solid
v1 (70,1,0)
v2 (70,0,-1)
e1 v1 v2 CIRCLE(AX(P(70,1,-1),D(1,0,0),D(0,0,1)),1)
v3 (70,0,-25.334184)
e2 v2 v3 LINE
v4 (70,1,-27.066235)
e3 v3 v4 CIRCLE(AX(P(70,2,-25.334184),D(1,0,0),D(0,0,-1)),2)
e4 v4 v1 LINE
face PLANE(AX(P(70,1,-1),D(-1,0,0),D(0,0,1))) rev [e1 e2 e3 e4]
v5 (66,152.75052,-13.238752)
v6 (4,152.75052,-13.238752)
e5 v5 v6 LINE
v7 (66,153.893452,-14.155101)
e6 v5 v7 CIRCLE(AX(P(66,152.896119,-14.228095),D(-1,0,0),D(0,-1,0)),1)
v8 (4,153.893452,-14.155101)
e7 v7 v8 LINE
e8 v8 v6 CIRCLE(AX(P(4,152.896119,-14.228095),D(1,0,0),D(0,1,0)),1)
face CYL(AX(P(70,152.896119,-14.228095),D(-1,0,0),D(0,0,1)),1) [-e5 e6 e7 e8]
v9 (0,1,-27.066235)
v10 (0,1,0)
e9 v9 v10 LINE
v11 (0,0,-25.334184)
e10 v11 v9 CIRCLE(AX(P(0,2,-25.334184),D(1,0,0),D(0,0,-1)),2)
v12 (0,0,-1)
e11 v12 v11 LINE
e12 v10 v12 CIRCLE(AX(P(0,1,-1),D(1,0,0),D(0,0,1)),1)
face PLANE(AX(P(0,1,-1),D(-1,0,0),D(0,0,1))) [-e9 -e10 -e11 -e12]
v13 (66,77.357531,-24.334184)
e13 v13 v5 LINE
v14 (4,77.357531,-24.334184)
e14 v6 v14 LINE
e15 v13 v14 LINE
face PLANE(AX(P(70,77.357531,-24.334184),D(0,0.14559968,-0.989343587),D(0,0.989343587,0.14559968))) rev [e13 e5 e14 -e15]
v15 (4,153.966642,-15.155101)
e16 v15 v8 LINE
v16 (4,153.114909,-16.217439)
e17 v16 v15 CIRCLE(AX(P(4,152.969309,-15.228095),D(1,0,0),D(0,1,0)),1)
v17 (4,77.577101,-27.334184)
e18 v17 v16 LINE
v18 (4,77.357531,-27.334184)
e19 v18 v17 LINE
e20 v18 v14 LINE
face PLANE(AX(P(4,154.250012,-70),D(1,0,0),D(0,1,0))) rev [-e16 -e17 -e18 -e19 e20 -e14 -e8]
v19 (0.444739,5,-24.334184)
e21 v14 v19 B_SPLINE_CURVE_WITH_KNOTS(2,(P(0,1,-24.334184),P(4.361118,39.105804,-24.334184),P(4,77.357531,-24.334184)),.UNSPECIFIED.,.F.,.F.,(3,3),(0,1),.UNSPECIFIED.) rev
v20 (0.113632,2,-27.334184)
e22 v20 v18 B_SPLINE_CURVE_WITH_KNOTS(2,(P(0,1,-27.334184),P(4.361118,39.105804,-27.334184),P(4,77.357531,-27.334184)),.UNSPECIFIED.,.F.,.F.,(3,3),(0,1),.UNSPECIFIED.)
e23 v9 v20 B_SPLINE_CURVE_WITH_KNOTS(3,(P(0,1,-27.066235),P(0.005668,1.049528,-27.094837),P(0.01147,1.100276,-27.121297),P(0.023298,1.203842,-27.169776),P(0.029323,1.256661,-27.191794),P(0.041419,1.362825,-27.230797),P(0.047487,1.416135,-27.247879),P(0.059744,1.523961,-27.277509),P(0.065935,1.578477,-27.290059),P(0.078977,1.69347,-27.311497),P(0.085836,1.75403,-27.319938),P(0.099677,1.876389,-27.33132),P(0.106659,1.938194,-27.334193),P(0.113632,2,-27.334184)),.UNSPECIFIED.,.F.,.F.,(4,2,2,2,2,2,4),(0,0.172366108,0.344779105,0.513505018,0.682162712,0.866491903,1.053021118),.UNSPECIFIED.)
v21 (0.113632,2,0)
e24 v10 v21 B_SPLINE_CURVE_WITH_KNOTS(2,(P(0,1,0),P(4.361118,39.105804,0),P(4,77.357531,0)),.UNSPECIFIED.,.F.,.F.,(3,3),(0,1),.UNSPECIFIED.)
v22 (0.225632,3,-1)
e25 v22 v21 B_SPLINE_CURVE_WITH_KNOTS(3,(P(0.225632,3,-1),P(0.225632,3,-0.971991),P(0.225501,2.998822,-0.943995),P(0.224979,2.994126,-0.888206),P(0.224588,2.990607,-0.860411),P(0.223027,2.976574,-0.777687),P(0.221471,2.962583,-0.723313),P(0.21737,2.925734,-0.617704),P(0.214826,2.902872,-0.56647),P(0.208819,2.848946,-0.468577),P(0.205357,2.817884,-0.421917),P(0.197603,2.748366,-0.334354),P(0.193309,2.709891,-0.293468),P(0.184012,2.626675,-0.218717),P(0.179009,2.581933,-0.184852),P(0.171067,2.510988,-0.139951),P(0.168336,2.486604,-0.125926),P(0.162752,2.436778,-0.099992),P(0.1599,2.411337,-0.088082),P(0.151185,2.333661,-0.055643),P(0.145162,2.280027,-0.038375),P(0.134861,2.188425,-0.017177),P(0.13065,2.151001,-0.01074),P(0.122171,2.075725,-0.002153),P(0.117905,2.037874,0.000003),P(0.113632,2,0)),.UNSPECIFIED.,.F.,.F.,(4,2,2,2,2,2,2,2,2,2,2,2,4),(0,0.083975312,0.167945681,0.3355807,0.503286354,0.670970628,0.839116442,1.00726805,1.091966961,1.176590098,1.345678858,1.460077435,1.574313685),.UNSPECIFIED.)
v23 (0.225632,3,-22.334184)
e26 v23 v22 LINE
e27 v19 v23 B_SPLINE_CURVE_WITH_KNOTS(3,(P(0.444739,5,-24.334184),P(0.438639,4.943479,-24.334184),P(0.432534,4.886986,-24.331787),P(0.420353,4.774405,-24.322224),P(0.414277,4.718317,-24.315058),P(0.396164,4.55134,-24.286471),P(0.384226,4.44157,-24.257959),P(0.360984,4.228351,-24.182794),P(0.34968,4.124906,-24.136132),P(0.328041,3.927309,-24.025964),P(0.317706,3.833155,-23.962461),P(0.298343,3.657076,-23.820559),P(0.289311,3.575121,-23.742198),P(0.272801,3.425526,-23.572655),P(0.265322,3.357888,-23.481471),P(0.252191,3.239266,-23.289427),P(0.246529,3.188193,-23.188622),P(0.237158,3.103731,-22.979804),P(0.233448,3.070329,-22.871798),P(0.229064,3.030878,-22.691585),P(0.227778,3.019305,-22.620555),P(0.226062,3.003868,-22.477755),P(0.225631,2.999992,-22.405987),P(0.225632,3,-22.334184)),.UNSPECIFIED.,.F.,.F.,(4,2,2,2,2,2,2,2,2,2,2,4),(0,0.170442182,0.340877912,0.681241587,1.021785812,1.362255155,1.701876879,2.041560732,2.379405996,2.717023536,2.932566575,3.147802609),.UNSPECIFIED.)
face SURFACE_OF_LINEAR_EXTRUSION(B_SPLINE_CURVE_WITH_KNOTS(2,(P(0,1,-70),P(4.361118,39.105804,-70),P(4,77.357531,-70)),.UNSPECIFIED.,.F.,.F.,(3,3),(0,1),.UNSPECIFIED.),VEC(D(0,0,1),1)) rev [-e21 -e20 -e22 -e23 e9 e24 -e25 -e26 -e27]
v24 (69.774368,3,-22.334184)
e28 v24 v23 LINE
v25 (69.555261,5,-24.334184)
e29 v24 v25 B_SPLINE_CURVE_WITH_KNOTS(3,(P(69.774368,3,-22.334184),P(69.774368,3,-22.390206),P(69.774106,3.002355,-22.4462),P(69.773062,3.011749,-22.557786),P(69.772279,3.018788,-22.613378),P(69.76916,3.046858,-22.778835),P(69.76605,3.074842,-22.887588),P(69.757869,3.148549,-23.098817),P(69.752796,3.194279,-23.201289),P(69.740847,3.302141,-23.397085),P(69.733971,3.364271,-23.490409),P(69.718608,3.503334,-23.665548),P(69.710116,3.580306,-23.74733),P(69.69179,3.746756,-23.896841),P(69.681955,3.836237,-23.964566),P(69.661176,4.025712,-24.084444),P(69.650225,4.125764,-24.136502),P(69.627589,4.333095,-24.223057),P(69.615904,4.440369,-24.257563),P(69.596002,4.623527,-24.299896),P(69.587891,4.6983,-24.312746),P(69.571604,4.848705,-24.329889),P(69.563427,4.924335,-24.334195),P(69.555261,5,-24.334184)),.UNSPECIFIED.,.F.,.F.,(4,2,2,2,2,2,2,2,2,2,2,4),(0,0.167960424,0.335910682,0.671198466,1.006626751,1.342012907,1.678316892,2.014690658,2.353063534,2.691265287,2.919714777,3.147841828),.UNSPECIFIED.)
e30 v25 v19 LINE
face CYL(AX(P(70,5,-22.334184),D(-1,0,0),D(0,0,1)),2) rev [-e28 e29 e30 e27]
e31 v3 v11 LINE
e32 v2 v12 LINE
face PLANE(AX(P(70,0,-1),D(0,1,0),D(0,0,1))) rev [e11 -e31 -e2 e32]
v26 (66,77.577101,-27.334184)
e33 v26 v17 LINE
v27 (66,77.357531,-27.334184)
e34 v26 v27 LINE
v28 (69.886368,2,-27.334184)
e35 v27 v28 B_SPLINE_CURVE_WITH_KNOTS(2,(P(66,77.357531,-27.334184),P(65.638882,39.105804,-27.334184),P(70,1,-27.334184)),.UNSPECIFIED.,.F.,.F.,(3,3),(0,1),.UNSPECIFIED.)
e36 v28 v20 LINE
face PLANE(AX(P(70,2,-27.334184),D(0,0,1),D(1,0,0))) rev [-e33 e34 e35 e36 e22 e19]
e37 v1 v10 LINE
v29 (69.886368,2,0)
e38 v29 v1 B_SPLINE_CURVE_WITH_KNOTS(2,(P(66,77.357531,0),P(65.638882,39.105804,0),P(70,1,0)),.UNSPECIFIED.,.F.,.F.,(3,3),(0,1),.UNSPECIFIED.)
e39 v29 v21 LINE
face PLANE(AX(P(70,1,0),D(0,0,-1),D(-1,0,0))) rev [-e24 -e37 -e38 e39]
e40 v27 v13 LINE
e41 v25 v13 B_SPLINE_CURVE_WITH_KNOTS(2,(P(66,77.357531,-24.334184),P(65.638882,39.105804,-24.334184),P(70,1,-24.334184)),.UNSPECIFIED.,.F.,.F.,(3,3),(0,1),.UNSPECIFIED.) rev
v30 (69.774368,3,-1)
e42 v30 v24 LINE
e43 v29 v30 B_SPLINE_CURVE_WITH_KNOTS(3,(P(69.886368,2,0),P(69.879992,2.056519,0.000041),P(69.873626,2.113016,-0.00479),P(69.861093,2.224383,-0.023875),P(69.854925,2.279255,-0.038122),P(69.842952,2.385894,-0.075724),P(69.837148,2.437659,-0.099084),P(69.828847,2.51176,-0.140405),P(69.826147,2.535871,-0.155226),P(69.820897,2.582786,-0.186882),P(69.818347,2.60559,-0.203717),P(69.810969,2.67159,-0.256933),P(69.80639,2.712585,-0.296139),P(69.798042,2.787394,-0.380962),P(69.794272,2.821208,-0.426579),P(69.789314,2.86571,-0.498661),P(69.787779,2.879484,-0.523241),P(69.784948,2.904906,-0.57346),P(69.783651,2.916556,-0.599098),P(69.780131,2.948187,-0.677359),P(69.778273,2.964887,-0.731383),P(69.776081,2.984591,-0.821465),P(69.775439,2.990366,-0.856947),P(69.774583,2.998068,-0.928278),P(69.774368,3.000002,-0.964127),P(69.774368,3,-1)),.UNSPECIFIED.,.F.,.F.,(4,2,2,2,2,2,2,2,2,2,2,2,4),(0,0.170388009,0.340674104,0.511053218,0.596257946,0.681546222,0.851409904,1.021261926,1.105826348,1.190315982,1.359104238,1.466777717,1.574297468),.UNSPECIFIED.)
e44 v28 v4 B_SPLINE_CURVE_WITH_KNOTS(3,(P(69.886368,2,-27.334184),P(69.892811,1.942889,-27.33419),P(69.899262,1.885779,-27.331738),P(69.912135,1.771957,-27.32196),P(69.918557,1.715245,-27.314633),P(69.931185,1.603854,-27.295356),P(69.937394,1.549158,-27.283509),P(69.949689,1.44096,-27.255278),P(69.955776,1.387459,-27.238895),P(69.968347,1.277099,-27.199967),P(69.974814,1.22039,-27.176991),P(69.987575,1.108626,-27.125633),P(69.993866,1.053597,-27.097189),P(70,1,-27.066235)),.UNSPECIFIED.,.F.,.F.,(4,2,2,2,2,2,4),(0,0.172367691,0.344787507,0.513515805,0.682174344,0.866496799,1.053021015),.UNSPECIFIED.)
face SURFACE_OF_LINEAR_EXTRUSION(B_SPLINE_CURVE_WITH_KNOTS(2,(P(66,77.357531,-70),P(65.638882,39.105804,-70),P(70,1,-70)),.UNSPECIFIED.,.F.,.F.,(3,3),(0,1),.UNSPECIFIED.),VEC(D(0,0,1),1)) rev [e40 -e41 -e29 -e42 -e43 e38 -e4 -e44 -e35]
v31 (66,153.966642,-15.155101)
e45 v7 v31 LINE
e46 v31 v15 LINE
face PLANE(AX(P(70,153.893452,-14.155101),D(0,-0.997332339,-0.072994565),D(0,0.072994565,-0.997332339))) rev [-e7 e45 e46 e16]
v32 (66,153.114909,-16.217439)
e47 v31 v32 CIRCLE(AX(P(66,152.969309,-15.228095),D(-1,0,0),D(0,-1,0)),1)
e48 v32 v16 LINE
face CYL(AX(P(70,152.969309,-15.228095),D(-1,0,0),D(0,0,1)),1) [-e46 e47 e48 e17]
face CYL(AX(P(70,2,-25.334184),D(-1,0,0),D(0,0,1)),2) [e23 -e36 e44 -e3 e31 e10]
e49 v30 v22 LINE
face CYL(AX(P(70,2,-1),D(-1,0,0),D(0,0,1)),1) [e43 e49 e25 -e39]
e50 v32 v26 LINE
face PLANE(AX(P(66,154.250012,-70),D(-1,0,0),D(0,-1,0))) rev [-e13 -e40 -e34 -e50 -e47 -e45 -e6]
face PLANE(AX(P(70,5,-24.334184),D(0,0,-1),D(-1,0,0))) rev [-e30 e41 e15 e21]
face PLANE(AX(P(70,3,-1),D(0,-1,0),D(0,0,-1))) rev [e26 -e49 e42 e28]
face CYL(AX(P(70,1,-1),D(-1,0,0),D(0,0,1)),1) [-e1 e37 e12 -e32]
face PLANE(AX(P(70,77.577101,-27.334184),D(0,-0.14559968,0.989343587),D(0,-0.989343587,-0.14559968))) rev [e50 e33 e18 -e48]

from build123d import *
from OCP.BRepAlgoAPI import BRepAlgoAPI_Cut
from OCP.TopTools import TopTools_ListOfShape

# Parameters (mm, degrees)
BOSS_EXTRUDE1_DEPTH = 70
CUT_EXTRUDE4_DEPTH  = 70


with BuildPart() as part:
    # Sketch1 → Boss-Extrude1 (new body)
    with BuildSketch(Plane(origin=(0, 0, 0), x_dir=(0, 0, -1), z_dir=(1, 0, 0))):
        with BuildLine():
            Line((1, 0), (25.334184189, 0))
            ThreePointArc((25.334184189, 0), (26.748397751, 0.585786438), (27.334184189, 2))
            Line((27.334184189, 2), (27.334184189, 77.577100538))
            Line((27.334184189, 77.577100538), (16.217438852, 153.114908847))
            ThreePointArc((16.217438852, 153.114908847), (15.853623852, 153.749510415), (15.155100701, 153.966641506))
            Line((15.155100701, 153.966641506), (14.155100701, 153.893451695))
            ThreePointArc((14.155100701, 153.893451695), (13.447894018, 153.521647944), (13.238751678, 152.750519677))
            Line((13.238751678, 152.750519677), (24.334184189, 77.357531107))
            Line((24.334184189, 77.357531107), (24.334184189, 5))
            ThreePointArc((24.334184189, 5), (23.748397751, 3.585786438), (22.334184189, 3))
            Line((22.334184189, 3), (1, 3))
            ThreePointArc((1, 3), (0.292893219, 2.707106781), (0, 2))
            Line((0, 2), (0, 1))
            ThreePointArc((0, 1), (0.292893219, 0.292893219), (1, 0))
        make_face()
    extrude(amount=BOSS_EXTRUDE1_DEPTH)


with BuildPart() as cut_extrude4_tool:
    # Sketch2 → Cut-Extrude4 (new body)
    with BuildSketch(Plane.XY):
        with BuildLine():
            Line((0, 1), (0, 154.250011553))
            Line((0, 154.250011553), (4, 154.250011553))
            Line((4, 154.250011553), (4, 77.357531107))
            add(Edge.make_bspline(
                [(4, 77.357531107), (4.361118304, 39.105803732), (0, 1)],
                knots=[0, 0, 0, 1, 1, 1], degree=2))
        make_face()
        with BuildLine():
            Line((70, 154.250011553), (66, 154.250011553))
            Line((66, 154.250011553), (66, 77.357531107))
            add(Edge.make_bspline(
                [(66, 77.357531107), (65.638881696, 39.105803732), (70, 1)],
                knots=[0, 0, 0, 1, 1, 1], degree=2))
            Line((70, 1), (70, 154.250011553))
        make_face()
    extrude(amount=-CUT_EXTRUDE4_DEPTH)


with BuildPart() as part_1:
    add(part.part)

    # Cut-Extrude4: cut by cut_extrude4_tool, with a tolerance
    cut_extrude4_stock = TopTools_ListOfShape()
    cut_extrude4_stock.Append(part_1.part.wrapped)
    cut_extrude4_tools = TopTools_ListOfShape()
    cut_extrude4_tools.Append(cut_extrude4_tool.part.wrapped)
    cut_extrude4_cut = BRepAlgoAPI_Cut()
    cut_extrude4_cut.SetArguments(cut_extrude4_stock)
    cut_extrude4_cut.SetTools(cut_extrude4_tools)
    cut_extrude4_cut.SetFuzzyValue(0.00001)
    cut_extrude4_cut.Build()
    add(Compound.cast(cut_extrude4_cut.Shape()).solids(), mode=Mode.REPLACE)


solid = part_1.part
